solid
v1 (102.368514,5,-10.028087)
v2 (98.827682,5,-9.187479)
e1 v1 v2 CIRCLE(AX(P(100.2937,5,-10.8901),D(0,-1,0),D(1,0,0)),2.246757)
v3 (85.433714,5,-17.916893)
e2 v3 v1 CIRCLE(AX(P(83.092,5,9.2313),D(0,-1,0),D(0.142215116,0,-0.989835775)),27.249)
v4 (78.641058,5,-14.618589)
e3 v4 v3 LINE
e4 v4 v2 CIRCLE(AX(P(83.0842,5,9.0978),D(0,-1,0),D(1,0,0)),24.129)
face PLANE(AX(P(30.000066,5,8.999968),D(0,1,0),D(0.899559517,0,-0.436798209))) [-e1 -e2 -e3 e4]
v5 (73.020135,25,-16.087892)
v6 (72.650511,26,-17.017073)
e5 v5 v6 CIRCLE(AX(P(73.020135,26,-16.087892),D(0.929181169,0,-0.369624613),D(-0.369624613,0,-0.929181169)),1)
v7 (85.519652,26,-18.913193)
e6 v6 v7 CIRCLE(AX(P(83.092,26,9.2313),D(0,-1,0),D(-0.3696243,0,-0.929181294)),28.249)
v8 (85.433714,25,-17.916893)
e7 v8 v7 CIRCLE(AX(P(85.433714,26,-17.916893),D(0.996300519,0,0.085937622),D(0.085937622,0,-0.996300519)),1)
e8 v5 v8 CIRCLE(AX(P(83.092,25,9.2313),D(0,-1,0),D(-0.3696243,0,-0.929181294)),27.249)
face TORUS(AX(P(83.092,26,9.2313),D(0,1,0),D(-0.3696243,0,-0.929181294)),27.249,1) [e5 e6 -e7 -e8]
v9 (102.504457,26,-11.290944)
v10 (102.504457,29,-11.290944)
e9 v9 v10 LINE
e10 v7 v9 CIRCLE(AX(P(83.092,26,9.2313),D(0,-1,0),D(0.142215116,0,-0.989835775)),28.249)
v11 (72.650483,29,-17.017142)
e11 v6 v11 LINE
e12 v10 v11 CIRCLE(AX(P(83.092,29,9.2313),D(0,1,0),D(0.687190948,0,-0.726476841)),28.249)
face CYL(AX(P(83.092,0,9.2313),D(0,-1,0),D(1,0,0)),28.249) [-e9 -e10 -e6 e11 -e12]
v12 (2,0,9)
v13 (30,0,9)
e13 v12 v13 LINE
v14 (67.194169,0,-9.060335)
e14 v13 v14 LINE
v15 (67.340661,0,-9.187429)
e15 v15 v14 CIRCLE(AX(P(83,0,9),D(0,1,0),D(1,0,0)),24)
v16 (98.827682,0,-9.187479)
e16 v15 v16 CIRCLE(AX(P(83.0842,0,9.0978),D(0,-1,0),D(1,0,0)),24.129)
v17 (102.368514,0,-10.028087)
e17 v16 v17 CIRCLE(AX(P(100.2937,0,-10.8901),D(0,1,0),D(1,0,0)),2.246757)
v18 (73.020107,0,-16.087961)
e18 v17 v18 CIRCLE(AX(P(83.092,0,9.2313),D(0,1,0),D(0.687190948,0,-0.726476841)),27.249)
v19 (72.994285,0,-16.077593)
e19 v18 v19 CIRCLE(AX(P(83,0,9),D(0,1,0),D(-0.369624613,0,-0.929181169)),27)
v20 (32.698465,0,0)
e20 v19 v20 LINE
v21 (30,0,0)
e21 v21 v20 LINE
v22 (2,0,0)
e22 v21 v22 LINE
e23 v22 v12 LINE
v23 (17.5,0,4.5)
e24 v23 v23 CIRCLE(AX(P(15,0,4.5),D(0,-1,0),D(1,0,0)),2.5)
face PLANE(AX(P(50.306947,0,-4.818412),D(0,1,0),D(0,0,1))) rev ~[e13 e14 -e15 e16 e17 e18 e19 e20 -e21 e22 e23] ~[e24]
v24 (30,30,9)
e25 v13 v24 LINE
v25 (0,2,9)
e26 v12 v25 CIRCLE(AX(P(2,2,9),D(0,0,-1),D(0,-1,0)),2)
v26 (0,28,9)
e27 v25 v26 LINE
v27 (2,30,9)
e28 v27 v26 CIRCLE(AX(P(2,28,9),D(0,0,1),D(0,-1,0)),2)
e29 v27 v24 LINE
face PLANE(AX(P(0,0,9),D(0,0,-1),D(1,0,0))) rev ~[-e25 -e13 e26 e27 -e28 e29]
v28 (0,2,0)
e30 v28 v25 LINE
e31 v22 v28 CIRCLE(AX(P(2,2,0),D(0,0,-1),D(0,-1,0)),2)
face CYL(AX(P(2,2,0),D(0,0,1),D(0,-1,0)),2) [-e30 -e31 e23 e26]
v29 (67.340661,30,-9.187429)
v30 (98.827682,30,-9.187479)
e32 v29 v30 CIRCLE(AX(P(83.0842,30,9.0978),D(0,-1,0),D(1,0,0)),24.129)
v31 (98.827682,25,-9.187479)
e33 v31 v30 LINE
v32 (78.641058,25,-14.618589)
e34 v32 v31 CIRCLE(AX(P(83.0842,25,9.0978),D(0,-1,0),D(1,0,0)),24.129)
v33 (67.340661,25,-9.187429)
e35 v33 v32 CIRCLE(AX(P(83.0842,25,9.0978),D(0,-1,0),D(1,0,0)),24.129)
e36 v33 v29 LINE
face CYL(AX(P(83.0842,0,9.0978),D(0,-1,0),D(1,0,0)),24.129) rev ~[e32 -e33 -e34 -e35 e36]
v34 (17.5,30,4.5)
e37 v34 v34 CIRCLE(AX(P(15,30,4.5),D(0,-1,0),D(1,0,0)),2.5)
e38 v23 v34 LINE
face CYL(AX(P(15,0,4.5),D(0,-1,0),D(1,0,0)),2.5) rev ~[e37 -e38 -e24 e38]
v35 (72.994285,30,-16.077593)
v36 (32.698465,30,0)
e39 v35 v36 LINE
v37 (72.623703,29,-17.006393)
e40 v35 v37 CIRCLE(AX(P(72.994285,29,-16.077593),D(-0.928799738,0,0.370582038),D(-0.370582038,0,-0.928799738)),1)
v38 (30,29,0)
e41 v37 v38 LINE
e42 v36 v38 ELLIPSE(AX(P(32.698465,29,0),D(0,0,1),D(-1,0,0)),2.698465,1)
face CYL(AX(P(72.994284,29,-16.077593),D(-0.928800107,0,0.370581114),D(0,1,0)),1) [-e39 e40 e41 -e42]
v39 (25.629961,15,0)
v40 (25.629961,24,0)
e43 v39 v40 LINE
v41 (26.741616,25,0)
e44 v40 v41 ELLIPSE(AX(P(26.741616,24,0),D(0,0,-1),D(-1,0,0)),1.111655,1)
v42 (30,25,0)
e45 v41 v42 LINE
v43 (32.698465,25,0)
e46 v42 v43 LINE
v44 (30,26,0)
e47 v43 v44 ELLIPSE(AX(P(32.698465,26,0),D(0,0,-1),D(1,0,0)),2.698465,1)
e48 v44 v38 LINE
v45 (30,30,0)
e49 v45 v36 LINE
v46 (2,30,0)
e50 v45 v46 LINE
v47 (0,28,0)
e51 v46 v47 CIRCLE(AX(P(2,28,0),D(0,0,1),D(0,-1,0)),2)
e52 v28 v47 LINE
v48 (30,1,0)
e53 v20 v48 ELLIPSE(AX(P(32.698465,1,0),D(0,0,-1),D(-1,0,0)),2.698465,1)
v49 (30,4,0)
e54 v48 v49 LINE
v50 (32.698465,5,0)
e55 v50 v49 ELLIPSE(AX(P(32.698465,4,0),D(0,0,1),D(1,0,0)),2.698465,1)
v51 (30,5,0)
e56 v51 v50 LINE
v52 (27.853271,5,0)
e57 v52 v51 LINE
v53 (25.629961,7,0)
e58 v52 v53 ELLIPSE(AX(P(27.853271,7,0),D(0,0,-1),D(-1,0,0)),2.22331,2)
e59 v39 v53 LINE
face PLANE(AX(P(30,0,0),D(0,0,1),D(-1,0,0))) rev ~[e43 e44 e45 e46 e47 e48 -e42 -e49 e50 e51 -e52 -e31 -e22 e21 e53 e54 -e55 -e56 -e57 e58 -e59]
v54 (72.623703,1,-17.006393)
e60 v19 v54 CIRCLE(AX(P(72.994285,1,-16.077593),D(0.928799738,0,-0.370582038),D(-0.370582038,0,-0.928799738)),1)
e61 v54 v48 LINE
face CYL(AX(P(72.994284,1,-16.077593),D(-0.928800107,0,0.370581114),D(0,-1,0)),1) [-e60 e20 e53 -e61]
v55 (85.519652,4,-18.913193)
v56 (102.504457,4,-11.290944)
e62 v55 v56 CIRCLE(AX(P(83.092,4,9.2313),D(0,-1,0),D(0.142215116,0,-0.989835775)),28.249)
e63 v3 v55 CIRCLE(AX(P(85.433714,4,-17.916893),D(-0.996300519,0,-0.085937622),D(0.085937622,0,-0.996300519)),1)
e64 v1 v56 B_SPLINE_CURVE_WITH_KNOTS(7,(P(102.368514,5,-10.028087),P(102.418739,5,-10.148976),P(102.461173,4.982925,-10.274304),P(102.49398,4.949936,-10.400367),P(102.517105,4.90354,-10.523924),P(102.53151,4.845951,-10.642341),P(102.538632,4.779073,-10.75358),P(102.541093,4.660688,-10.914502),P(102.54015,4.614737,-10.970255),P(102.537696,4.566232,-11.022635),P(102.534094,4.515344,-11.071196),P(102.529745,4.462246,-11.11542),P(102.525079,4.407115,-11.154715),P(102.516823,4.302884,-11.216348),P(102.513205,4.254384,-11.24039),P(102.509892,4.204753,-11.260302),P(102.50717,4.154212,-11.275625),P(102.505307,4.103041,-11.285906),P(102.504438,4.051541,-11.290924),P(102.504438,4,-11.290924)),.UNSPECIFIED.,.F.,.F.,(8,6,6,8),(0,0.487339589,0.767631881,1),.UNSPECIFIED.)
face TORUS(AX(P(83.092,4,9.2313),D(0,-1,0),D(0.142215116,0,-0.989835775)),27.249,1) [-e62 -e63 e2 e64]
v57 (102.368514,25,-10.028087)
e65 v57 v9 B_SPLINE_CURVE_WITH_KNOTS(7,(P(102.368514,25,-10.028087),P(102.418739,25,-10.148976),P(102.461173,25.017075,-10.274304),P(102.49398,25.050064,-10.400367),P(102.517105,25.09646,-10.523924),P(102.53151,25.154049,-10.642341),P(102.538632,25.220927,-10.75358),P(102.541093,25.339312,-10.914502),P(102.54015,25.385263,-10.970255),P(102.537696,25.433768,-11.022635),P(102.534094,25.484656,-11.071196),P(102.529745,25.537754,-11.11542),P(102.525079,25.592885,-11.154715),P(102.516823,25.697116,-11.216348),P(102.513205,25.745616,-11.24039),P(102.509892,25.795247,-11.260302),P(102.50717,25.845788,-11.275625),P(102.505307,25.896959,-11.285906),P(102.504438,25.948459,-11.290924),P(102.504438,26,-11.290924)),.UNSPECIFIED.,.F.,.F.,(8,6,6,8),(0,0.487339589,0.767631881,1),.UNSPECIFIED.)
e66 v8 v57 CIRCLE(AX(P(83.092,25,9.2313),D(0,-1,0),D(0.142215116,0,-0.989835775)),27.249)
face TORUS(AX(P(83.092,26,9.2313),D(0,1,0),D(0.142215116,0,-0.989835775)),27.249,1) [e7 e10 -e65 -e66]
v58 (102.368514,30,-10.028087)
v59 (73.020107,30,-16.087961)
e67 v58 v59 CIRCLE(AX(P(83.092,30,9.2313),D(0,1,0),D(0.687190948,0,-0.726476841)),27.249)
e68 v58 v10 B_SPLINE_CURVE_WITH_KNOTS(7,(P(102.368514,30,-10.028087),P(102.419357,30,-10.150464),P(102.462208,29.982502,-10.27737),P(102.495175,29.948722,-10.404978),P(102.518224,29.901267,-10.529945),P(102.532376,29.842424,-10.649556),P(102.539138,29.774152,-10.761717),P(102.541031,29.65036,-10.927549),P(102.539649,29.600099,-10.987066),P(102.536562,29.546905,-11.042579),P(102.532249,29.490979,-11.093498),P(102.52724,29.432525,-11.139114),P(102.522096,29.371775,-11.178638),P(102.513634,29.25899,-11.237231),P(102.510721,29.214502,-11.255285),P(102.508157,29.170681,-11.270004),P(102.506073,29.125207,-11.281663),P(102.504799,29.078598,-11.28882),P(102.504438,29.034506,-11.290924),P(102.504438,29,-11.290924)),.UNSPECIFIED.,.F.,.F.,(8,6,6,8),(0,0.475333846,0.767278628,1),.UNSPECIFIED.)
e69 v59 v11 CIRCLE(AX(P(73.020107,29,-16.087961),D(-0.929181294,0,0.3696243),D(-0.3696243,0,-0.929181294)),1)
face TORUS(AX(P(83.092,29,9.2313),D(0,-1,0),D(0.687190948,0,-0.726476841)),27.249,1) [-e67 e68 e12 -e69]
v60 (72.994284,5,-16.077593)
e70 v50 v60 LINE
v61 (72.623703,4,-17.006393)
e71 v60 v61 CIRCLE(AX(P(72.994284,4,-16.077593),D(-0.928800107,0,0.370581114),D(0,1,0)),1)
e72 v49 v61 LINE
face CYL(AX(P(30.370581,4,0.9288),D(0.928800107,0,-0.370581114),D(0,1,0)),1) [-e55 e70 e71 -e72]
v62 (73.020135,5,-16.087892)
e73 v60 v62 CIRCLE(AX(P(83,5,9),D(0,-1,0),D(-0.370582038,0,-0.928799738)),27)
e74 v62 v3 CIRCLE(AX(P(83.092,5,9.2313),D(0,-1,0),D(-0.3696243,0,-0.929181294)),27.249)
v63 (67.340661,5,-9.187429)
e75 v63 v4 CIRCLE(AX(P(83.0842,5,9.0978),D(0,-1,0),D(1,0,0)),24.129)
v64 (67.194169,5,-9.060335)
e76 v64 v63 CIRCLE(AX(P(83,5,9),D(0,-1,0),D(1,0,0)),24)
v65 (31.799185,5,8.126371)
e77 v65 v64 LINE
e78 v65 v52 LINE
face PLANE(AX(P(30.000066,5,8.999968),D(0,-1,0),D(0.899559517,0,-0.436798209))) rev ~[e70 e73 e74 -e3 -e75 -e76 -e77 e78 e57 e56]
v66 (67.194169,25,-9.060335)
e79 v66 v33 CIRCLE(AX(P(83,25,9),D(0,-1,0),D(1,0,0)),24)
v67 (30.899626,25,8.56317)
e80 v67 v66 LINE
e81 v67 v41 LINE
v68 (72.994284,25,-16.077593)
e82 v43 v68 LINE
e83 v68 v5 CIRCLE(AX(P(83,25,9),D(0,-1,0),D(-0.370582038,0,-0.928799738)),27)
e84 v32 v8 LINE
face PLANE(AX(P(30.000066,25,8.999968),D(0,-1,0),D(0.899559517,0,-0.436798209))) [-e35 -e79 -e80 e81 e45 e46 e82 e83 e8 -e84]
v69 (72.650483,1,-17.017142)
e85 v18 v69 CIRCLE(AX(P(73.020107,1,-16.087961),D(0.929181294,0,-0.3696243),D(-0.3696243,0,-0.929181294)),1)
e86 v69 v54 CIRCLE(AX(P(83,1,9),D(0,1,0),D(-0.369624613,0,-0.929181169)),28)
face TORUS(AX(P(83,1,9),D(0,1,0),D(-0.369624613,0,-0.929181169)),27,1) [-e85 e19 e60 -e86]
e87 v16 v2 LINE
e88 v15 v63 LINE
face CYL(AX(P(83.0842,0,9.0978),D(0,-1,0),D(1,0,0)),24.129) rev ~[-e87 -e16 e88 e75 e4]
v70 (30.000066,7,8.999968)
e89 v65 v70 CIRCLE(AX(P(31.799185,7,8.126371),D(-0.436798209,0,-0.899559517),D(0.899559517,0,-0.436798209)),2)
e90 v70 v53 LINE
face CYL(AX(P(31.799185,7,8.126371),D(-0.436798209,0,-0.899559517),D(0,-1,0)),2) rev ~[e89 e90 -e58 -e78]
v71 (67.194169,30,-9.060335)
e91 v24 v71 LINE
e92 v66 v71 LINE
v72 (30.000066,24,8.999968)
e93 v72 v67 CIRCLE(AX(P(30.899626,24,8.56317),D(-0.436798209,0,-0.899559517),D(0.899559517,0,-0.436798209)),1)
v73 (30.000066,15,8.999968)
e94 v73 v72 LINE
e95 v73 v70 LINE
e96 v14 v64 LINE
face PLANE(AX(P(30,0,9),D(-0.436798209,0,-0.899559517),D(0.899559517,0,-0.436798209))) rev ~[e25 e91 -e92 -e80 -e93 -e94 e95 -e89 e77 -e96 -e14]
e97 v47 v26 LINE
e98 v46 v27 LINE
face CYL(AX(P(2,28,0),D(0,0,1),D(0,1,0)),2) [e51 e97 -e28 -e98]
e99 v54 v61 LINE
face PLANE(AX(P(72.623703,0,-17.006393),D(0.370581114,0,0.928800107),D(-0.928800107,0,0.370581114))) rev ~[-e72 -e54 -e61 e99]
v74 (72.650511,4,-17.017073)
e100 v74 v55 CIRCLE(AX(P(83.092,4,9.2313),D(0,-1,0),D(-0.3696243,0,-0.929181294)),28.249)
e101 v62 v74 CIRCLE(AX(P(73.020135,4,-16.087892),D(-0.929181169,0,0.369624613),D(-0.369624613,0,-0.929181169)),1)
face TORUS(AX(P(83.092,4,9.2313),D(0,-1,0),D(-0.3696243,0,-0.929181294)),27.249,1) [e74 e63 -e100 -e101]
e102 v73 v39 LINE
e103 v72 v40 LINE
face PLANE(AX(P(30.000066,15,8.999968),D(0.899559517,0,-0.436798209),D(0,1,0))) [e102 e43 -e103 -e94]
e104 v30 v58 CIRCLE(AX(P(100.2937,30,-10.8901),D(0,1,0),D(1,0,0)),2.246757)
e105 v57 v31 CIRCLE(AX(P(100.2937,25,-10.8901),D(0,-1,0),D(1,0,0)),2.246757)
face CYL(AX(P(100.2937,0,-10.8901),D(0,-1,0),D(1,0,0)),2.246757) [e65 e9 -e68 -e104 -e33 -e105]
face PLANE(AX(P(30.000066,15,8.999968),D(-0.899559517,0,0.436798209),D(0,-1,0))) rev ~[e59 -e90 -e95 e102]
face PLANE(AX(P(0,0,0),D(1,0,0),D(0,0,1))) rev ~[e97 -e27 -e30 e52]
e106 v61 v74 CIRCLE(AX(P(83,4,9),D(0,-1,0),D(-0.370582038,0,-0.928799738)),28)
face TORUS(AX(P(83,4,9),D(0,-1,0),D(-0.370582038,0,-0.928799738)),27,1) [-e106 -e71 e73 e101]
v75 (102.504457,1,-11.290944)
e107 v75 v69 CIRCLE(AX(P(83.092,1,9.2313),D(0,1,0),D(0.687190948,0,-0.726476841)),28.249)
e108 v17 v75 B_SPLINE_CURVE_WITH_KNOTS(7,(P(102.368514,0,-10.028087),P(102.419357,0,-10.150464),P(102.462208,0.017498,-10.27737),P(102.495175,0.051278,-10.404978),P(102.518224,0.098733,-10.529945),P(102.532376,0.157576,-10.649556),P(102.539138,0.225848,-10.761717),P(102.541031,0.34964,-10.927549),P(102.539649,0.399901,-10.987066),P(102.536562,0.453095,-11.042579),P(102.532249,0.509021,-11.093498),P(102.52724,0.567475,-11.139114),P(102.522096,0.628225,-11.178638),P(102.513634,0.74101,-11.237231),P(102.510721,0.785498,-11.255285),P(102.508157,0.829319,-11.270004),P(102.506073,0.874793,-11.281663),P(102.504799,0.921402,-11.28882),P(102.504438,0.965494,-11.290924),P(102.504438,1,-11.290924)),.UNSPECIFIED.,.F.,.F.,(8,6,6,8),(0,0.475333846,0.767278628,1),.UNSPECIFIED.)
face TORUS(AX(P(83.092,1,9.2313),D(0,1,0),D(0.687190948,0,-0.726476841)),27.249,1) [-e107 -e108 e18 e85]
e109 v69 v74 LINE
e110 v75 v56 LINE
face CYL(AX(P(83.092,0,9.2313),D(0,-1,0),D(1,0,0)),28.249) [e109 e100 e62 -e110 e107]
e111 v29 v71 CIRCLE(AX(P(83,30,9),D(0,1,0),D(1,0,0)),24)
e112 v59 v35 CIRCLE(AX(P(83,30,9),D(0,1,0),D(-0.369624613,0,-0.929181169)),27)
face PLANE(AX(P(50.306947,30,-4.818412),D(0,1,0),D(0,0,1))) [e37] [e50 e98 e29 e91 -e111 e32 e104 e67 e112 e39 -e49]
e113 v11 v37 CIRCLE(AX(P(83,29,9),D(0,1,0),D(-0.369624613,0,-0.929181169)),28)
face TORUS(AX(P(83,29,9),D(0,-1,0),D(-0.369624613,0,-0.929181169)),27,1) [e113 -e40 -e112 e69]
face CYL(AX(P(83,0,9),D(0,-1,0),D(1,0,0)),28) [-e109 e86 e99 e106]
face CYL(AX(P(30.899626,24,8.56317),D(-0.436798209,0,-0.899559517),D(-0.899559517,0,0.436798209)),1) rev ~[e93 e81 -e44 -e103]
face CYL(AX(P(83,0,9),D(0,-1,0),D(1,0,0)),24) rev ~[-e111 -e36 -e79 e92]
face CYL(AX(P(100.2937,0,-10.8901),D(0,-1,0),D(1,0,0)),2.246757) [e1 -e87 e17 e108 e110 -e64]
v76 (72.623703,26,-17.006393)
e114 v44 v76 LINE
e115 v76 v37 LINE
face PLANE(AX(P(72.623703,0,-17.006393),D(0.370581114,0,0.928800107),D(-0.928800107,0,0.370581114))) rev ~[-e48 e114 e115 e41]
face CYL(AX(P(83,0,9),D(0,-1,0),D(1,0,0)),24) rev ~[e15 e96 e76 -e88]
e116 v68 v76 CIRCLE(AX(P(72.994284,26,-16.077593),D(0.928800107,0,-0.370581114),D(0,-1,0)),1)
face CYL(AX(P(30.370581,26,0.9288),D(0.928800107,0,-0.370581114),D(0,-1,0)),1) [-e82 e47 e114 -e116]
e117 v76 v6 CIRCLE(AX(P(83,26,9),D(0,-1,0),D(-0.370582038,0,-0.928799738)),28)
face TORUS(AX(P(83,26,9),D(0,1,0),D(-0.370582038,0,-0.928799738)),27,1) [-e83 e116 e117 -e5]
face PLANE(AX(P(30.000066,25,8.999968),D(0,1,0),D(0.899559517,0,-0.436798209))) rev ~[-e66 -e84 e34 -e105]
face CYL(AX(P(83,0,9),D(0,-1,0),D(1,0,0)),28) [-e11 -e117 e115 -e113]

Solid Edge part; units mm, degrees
sketch "Sketch1" plane through (0, 0, 0) normal (0, -1, 0) x (1, 0, 0)
  line L0 (30, 9) -> (67.1942, -9.0603)
  arc A0 (67.3406, -9.1875) -> (98.8277, -9.1875) centre (83.0842, 9.0978) ccw
  arc A1 (98.8277, -9.1875) -> (102.5044, -11.2909) centre (100.2937, -10.8901) cw
  arc A2 (72.6505, -17.0171) -> (102.5044, -11.2909) centre (83.092, 9.2313) ccw
  line L1 (72.6237, -17.0064) -> (30, 0)
  line L2 (30, 0) -> (0, 0)
  line L3 (0, 0) -> (0, 9)
  line L4 (0, 9) -> (30, 9)
  arc A3 (67.3406, -9.1875) -> (67.1942, -9.0603) centre (83, 9) cw
  arc A4 (72.6505, -17.0171) -> (72.6237, -17.0064) centre (83, 9) cw
extrude "Protrusion1" add sketch "Sketch1" against normal blind 30
sketch "Sketch2" plane through (48.5971, 15, -0.0302) normal (0.4367982, 0, 0.8995595) x (0, 1, 0)
  line L0 (-10, 20.6735) -> (-10, -53.4115)
  line L1 (0, 20.6735) -> (-10, 20.6735)
  line L2 (0, 20.6735) -> (10, 20.6735)
  line L3 (10, 20.6735) -> (10, -53.4115)
extrude "Recorte_Extrudado_1" cut sketch "Sketch2" along normal blind 140 material side at (63.322, 5.05, -7.1801)
sketch "Sketch3" plane through (48.5971, 15, -0.0302) normal (0.4367982, 0, 0.8995595) x (0, 1, 0)
  line L0 (10, 20.6735) -> (10, -53.4115)
  line L1 (0, 20.6735) -> (10, 20.6735)
  line L2 (0, 20.6735) -> (-10, 20.6735)
  line L3 (-10, 20.6735) -> (-10, -53.4115)
extrude "Recorte_Extrudado_2" cut sketch "Sketch3" against normal blind 100 material side at (63.322, 24.95, -7.1801)
fillet "Redondo_1" radius 2 3 edges at (27.8149, 5, 4.5) (0, 0, 4.5) (0, 30, 4.5)
fillet "Redondo_1" radius 1 1 edges at (27.8149, 25, 4.5)
sketch "Sketch4" plane through (0, 0, 0) normal (0, -1, 0) x (1, 0, 0)
  circle A0 centre (15, 4.5) radius 2.5
extrude "Recorte_Extrudado_3" cut sketch "Sketch4" against normal blind 100
fillet "Redondo_3" radius 1 12 edges at (51.3119, 30, -8.5032) (72.6371, 30, -17.0117) (88.4133, 30, -18.5119) (51.3119, 25, -8.5032) (72.6371, 25, -17.0117) (88.4133, 25, -18.5119) (51.3119, 5, -8.5032) (72.6371, 5, -17.0117) (88.4133, 5, -18.5119) (51.3119, 0, -8.5032) (72.6371, 0, -17.0117) (88.4133, 0, -18.5119)
